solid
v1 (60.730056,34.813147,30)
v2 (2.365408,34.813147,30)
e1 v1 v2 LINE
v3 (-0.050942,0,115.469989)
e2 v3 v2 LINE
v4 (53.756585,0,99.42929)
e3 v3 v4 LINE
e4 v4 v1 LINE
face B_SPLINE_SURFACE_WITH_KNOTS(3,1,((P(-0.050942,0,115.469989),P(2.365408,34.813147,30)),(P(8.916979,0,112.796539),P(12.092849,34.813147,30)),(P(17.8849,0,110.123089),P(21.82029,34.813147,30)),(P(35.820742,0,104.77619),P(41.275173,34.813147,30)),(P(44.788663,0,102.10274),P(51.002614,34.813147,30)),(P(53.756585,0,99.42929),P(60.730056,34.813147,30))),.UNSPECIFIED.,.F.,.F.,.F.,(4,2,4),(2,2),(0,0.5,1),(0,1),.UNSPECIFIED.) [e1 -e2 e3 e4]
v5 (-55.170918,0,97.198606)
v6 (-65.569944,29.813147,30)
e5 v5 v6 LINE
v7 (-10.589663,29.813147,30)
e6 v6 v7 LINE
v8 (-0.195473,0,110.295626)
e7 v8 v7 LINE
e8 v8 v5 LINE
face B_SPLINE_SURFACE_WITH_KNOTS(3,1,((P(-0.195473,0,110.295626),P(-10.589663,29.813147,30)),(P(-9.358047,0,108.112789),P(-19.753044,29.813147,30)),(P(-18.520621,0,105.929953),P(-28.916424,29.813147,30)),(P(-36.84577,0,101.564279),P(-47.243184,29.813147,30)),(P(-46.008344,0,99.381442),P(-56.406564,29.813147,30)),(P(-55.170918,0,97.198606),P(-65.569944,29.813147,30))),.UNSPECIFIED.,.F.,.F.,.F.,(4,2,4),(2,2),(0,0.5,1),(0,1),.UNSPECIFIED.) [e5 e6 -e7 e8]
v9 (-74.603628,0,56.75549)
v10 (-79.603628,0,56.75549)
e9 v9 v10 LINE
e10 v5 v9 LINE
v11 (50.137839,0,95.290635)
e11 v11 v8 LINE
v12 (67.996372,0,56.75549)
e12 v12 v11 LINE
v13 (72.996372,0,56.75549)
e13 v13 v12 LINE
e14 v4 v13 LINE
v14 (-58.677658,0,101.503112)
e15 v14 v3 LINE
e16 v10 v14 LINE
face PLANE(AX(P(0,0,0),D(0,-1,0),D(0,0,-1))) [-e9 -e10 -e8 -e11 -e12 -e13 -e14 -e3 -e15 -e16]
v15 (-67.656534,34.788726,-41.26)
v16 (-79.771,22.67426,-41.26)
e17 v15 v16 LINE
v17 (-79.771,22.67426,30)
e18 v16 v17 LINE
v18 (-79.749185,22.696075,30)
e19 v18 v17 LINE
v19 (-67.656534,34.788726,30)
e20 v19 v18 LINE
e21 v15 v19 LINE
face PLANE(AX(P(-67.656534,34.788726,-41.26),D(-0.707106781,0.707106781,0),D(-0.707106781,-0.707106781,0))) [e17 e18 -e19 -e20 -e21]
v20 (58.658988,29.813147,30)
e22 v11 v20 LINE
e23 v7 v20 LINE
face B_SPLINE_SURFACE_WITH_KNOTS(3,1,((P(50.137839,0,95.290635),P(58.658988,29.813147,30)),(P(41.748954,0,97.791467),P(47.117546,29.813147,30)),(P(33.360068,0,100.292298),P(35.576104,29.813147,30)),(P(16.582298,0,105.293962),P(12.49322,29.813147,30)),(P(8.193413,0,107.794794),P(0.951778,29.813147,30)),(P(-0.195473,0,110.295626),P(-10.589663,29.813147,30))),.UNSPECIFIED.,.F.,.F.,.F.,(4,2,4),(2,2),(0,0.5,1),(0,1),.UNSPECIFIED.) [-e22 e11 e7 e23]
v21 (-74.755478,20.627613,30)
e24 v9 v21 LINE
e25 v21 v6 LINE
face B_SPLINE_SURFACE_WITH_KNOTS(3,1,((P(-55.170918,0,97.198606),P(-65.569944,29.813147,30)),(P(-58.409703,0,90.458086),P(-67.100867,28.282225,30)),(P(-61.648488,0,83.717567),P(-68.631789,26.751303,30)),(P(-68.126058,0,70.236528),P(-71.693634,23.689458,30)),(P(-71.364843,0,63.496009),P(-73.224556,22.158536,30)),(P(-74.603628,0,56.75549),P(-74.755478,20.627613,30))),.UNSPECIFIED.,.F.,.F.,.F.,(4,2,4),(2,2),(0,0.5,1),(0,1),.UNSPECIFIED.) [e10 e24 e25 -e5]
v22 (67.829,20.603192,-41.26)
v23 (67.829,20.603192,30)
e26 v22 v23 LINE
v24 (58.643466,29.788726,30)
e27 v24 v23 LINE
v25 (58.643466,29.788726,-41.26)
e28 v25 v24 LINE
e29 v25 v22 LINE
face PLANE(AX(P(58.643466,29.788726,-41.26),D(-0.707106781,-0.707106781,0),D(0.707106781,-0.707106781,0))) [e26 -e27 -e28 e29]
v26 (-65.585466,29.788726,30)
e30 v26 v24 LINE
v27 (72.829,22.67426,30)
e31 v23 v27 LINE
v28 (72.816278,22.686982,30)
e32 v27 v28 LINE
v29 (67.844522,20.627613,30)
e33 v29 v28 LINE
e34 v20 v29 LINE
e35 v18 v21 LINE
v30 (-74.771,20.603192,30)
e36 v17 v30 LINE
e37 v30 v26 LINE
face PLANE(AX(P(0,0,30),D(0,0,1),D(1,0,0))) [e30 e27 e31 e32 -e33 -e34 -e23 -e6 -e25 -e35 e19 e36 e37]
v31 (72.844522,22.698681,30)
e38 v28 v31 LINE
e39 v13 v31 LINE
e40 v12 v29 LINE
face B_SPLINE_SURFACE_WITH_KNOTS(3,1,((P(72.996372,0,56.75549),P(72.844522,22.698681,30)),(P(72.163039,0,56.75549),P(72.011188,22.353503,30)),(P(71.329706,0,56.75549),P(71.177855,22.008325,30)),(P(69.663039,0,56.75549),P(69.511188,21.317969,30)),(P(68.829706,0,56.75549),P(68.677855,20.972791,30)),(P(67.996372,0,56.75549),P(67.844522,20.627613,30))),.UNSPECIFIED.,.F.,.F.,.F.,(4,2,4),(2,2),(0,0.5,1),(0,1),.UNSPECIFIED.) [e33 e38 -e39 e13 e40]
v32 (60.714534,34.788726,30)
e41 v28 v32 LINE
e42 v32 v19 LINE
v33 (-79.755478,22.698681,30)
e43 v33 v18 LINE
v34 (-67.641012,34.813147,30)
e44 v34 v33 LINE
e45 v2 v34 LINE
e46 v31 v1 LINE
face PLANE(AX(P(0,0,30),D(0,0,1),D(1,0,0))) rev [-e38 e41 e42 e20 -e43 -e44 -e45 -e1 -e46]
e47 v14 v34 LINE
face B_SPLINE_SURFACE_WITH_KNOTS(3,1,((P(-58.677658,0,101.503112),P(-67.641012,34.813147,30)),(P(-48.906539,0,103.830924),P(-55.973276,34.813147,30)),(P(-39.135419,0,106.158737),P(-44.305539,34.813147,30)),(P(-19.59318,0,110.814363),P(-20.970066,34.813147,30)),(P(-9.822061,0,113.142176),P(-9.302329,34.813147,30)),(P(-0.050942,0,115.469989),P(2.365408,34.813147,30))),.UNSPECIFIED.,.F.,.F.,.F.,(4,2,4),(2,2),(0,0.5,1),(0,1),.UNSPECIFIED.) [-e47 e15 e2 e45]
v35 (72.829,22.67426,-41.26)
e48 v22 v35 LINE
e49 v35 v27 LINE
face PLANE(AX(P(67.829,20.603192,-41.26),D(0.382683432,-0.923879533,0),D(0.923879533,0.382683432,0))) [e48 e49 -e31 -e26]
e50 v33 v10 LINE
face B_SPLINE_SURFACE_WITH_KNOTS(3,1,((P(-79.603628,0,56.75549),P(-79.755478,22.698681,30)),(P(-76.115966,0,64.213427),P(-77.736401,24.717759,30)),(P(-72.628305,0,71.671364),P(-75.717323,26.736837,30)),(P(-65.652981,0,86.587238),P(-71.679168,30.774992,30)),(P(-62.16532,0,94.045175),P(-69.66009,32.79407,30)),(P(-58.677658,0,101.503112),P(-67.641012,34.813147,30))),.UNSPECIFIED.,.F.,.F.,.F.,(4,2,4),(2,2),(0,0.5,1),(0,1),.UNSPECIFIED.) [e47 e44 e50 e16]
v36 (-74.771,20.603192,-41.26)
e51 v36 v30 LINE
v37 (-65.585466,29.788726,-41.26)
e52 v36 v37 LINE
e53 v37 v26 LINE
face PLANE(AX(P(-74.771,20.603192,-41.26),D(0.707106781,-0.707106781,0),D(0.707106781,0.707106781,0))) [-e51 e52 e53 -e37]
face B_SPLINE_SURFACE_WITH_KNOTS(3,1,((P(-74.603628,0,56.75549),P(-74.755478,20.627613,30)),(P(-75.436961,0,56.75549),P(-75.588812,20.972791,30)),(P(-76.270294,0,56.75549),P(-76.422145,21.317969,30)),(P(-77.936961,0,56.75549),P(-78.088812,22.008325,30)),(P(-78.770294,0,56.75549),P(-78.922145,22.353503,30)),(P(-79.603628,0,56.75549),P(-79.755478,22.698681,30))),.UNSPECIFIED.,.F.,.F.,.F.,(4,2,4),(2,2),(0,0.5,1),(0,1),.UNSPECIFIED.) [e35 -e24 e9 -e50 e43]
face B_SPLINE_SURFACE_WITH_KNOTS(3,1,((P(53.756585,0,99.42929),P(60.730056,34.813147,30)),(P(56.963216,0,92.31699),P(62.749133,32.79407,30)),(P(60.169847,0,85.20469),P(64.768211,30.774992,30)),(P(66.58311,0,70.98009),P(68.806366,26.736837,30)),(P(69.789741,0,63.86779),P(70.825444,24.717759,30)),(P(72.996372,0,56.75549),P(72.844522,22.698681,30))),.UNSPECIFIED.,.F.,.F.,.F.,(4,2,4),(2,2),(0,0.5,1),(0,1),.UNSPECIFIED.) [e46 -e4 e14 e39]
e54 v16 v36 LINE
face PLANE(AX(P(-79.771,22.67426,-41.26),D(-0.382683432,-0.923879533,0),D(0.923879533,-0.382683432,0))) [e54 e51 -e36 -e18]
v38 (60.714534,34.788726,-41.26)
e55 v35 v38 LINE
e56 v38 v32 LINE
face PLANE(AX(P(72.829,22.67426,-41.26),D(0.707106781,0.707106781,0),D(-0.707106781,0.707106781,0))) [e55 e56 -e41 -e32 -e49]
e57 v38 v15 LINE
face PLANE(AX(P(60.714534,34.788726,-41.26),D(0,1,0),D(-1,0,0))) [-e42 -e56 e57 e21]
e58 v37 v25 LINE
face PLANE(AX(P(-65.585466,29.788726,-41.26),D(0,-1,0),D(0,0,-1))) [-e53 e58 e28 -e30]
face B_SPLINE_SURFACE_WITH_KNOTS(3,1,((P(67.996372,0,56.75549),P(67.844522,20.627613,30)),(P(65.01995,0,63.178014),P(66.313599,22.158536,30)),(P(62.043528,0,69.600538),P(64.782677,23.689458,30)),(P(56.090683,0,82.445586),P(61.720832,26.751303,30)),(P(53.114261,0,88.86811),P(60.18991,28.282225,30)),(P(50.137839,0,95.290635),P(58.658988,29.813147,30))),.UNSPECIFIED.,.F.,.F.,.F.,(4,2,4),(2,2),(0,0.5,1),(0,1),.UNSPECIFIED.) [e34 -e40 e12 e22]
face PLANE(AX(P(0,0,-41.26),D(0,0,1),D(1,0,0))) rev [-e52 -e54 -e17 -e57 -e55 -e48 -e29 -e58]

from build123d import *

# Parameters (mm, degrees)
BOSS_EXTRUDE1_DEPTH = 71.26


with BuildPart() as part:
    # Loft13: read off the stored shape, not the designer's step
    # Loft13: loft between two sections, ruled curve by curve
    loft13_from = [
        Edge.make_bspline([(-79.603627765, 0, 56.755489551), (-76.115966153, 0, 64.213426555), (-72.628304542, 0, 71.67136356), (-65.652981318, 0, 86.587237568), (-62.165319707, 0, 94.045174572), (-58.677658095, 0, 101.503111577)], [0, 0, 0, 0, 0.5, 0.5, 1, 1, 1, 1], 3),
        Edge.make_bspline([(-58.677658095, 0, 101.503111577), (-48.906538694, 0, 103.830924441), (-39.135419292, 0, 106.158737306), (-19.59318049, 0, 110.814363034), (-9.822061088, 0, 113.142175899), (-0.050941687, 0, 115.469988763)], [0, 0, 0, 0, 0.5, 0.5, 1, 1, 1, 1], 3),
        Edge.make_bspline([(-74.603627765, 0, 56.755489551), (-75.436961098, 0, 56.755489551), (-76.270294432, 0, 56.755489551), (-77.936961098, 0, 56.755489551), (-78.770294432, 0, 56.755489551), (-79.603627765, 0, 56.755489551)], [0, 0, 0, 0, 0.5, 0.5, 1, 1, 1, 1], 3),
        Edge.make_bspline([(-0.050941687, 0, 115.469988763), (8.91697935, 0, 112.796539052), (17.884900386, 0, 110.12308934), (35.820742459, 0, 104.776189918), (44.788663496, 0, 102.102740206), (53.756584532, 0, 99.429290495)], [0, 0, 0, 0, 0.5, 0.5, 1, 1, 1, 1], 3),
        Edge.make_bspline([(53.756584532, 0, 99.429290495), (56.963215816, 0, 92.316990338), (60.1698471, 0, 85.20469018), (66.583109668, 0, 70.980089866), (69.789740951, 0, 63.867789708), (72.996372235, 0, 56.755489551)], [0, 0, 0, 0, 0.5, 0.5, 1, 1, 1, 1], 3),
        Edge.make_bspline([(72.996372235, 0, 56.755489551), (72.163038902, 0, 56.755489551), (71.329705568, 0, 56.755489551), (69.663038902, 0, 56.755489551), (68.829705568, 0, 56.755489551), (67.996372235, 0, 56.755489551)], [0, 0, 0, 0, 0.5, 0.5, 1, 1, 1, 1], 3),
        Edge.make_bspline([(67.996372235, 0, 56.755489551), (65.019950017, 0, 63.178013733), (62.043527798, 0, 69.600537914), (56.090683362, 0, 82.445586278), (53.114261143, 0, 88.86811046), (50.137838925, 0, 95.290634641)], [0, 0, 0, 0, 0.5, 0.5, 1, 1, 1, 1], 3),
        Edge.make_bspline([(50.137838925, 0, 95.290634641), (41.74895364, 0, 97.791466534), (33.360068355, 0, 100.292298427), (16.582297786, 0, 105.293962214), (8.193412501, 0, 107.794794107), (-0.195472784, 0, 110.295626)], [0, 0, 0, 0, 0.5, 0.5, 1, 1, 1, 1], 3),
        Edge.make_bspline([(-0.195472784, 0, 110.295626), (-9.358047044, 0, 108.112789279), (-18.520621304, 0, 105.929952558), (-36.845769825, 0, 101.564279116), (-46.008344086, 0, 99.381442395), (-55.170918346, 0, 97.198605674)], [0, 0, 0, 0, 0.5, 0.5, 1, 1, 1, 1], 3),
        Edge.make_bspline([(-55.170918346, 0, 97.198605674), (-58.409703249, 0, 90.45808632), (-61.648488152, 0, 83.717566966), (-68.126057959, 0, 70.236528259), (-71.364842862, 0, 63.496008905), (-74.603627765, 0, 56.755489551)], [0, 0, 0, 0, 0.5, 0.5, 1, 1, 1, 1], 3),
    ]
    loft13_to = [
        Edge.make_bspline([(-79.755478337, 22.698681281, 30), (-77.736400655, 24.717758964, 30), (-75.717322973, 26.736836646, 30), (-71.679167608, 30.774992011, 30), (-69.660089926, 32.794069693, 30), (-67.641012243, 34.813147375, 30)], [0, 0, 0, 0, 0.5, 0.5, 1, 1, 1, 1], 3),
        Edge.make_bspline([(-67.641012243, 34.813147375, 30), (-55.973275602, 34.813147375, 30), (-44.305538961, 34.813147375, 30), (-20.97006568, 34.813147375, 30), (-9.302329039, 34.813147375, 30), (2.365407602, 34.813147375, 30)], [0, 0, 0, 0, 0.5, 0.5, 1, 1, 1, 1], 3),
        Edge.make_bspline([(-74.755478337, 20.62761347, 30), (-75.588811671, 20.972791438, 30), (-76.422145004, 21.317969407, 30), (-78.088811671, 22.008325344, 30), (-78.922145004, 22.353503313, 30), (-79.755478337, 22.698681281, 30)], [0, 0, 0, 0, 0.5, 0.5, 1, 1, 1, 1], 3),
        Edge.make_bspline([(2.365407602, 34.813147375, 30), (12.09284893, 34.813147375, 30), (21.820290258, 34.813147375, 30), (41.275172913, 34.813147375, 30), (51.002614241, 34.813147375, 30), (60.730055569, 34.813147375, 30)], [0, 0, 0, 0, 0.5, 0.5, 1, 1, 1, 1], 3),
        Edge.make_bspline([(60.730055569, 34.813147375, 30), (62.749133251, 32.794069693, 30), (64.768210933, 30.774992011, 30), (68.806366298, 26.736836646, 30), (70.82544398, 24.717758964, 30), (72.844521663, 22.698681281, 30)], [0, 0, 0, 0, 0.5, 0.5, 1, 1, 1, 1], 3),
        Edge.make_bspline([(72.844521663, 22.698681281, 30), (72.011188329, 22.353503313, 30), (71.177854996, 22.008325344, 30), (69.511188329, 21.317969407, 30), (68.677854996, 20.972791438, 30), (67.844521663, 20.62761347, 30)], [0, 0, 0, 0, 0.5, 0.5, 1, 1, 1, 1], 3),
        Edge.make_bspline([(67.844521663, 20.62761347, 30), (66.313599345, 22.158535787, 30), (64.782677027, 23.689458105, 30), (61.720832392, 26.75130274, 30), (60.189910074, 28.282225058, 30), (58.658987757, 29.813147375, 30)], [0, 0, 0, 0, 0.5, 0.5, 1, 1, 1, 1], 3),
        Edge.make_bspline([(58.658987757, 29.813147375, 30), (47.117545897, 29.813147375, 30), (35.576104037, 29.813147375, 30), (12.493220317, 29.813147375, 30), (0.951778457, 29.813147375, 30), (-10.589663403, 29.813147375, 30)], [0, 0, 0, 0, 0.5, 0.5, 1, 1, 1, 1], 3),
        Edge.make_bspline([(-10.589663403, 29.813147375, 30), (-19.753043574, 29.813147375, 30), (-28.916423746, 29.813147375, 30), (-47.243184088, 29.813147375, 30), (-56.40656426, 29.813147375, 30), (-65.569944431, 29.813147375, 30)], [0, 0, 0, 0, 0.5, 0.5, 1, 1, 1, 1], 3),
        Edge.make_bspline([(-65.569944431, 29.813147375, 30), (-67.100866749, 28.282225058, 30), (-68.631789067, 26.75130274, 30), (-71.693633702, 23.689458105, 30), (-73.22455602, 22.158535787, 30), (-74.755478337, 20.62761347, 30)], [0, 0, 0, 0, 0.5, 0.5, 1, 1, 1, 1], 3),
    ]
    loft13 = Solid(Shell([*[Face.make_surface_from_curves(loft13_from[k], loft13_to[k]) for k in range(10)], Face(Wire(loft13_from)), Face(Wire(loft13_to))]))
    add(loft13)

    # Sketch9 → Boss-Extrude1 (add)
    with BuildSketch(Plane.XY.offset(30)):
        Polygon((-79.770999887, 22.67425966), (-74.770999887, 20.603191848), (-65.585465981, 29.788725754), (58.643466207, 29.788725754), (67.829000113, 20.603191848), (72.829000113, 22.67425966), (60.714534019, 34.788725754), (-67.656533793, 34.788725754), align=None)
    extrude(amount=-BOSS_EXTRUDE1_DEPTH)


solid = part.part
